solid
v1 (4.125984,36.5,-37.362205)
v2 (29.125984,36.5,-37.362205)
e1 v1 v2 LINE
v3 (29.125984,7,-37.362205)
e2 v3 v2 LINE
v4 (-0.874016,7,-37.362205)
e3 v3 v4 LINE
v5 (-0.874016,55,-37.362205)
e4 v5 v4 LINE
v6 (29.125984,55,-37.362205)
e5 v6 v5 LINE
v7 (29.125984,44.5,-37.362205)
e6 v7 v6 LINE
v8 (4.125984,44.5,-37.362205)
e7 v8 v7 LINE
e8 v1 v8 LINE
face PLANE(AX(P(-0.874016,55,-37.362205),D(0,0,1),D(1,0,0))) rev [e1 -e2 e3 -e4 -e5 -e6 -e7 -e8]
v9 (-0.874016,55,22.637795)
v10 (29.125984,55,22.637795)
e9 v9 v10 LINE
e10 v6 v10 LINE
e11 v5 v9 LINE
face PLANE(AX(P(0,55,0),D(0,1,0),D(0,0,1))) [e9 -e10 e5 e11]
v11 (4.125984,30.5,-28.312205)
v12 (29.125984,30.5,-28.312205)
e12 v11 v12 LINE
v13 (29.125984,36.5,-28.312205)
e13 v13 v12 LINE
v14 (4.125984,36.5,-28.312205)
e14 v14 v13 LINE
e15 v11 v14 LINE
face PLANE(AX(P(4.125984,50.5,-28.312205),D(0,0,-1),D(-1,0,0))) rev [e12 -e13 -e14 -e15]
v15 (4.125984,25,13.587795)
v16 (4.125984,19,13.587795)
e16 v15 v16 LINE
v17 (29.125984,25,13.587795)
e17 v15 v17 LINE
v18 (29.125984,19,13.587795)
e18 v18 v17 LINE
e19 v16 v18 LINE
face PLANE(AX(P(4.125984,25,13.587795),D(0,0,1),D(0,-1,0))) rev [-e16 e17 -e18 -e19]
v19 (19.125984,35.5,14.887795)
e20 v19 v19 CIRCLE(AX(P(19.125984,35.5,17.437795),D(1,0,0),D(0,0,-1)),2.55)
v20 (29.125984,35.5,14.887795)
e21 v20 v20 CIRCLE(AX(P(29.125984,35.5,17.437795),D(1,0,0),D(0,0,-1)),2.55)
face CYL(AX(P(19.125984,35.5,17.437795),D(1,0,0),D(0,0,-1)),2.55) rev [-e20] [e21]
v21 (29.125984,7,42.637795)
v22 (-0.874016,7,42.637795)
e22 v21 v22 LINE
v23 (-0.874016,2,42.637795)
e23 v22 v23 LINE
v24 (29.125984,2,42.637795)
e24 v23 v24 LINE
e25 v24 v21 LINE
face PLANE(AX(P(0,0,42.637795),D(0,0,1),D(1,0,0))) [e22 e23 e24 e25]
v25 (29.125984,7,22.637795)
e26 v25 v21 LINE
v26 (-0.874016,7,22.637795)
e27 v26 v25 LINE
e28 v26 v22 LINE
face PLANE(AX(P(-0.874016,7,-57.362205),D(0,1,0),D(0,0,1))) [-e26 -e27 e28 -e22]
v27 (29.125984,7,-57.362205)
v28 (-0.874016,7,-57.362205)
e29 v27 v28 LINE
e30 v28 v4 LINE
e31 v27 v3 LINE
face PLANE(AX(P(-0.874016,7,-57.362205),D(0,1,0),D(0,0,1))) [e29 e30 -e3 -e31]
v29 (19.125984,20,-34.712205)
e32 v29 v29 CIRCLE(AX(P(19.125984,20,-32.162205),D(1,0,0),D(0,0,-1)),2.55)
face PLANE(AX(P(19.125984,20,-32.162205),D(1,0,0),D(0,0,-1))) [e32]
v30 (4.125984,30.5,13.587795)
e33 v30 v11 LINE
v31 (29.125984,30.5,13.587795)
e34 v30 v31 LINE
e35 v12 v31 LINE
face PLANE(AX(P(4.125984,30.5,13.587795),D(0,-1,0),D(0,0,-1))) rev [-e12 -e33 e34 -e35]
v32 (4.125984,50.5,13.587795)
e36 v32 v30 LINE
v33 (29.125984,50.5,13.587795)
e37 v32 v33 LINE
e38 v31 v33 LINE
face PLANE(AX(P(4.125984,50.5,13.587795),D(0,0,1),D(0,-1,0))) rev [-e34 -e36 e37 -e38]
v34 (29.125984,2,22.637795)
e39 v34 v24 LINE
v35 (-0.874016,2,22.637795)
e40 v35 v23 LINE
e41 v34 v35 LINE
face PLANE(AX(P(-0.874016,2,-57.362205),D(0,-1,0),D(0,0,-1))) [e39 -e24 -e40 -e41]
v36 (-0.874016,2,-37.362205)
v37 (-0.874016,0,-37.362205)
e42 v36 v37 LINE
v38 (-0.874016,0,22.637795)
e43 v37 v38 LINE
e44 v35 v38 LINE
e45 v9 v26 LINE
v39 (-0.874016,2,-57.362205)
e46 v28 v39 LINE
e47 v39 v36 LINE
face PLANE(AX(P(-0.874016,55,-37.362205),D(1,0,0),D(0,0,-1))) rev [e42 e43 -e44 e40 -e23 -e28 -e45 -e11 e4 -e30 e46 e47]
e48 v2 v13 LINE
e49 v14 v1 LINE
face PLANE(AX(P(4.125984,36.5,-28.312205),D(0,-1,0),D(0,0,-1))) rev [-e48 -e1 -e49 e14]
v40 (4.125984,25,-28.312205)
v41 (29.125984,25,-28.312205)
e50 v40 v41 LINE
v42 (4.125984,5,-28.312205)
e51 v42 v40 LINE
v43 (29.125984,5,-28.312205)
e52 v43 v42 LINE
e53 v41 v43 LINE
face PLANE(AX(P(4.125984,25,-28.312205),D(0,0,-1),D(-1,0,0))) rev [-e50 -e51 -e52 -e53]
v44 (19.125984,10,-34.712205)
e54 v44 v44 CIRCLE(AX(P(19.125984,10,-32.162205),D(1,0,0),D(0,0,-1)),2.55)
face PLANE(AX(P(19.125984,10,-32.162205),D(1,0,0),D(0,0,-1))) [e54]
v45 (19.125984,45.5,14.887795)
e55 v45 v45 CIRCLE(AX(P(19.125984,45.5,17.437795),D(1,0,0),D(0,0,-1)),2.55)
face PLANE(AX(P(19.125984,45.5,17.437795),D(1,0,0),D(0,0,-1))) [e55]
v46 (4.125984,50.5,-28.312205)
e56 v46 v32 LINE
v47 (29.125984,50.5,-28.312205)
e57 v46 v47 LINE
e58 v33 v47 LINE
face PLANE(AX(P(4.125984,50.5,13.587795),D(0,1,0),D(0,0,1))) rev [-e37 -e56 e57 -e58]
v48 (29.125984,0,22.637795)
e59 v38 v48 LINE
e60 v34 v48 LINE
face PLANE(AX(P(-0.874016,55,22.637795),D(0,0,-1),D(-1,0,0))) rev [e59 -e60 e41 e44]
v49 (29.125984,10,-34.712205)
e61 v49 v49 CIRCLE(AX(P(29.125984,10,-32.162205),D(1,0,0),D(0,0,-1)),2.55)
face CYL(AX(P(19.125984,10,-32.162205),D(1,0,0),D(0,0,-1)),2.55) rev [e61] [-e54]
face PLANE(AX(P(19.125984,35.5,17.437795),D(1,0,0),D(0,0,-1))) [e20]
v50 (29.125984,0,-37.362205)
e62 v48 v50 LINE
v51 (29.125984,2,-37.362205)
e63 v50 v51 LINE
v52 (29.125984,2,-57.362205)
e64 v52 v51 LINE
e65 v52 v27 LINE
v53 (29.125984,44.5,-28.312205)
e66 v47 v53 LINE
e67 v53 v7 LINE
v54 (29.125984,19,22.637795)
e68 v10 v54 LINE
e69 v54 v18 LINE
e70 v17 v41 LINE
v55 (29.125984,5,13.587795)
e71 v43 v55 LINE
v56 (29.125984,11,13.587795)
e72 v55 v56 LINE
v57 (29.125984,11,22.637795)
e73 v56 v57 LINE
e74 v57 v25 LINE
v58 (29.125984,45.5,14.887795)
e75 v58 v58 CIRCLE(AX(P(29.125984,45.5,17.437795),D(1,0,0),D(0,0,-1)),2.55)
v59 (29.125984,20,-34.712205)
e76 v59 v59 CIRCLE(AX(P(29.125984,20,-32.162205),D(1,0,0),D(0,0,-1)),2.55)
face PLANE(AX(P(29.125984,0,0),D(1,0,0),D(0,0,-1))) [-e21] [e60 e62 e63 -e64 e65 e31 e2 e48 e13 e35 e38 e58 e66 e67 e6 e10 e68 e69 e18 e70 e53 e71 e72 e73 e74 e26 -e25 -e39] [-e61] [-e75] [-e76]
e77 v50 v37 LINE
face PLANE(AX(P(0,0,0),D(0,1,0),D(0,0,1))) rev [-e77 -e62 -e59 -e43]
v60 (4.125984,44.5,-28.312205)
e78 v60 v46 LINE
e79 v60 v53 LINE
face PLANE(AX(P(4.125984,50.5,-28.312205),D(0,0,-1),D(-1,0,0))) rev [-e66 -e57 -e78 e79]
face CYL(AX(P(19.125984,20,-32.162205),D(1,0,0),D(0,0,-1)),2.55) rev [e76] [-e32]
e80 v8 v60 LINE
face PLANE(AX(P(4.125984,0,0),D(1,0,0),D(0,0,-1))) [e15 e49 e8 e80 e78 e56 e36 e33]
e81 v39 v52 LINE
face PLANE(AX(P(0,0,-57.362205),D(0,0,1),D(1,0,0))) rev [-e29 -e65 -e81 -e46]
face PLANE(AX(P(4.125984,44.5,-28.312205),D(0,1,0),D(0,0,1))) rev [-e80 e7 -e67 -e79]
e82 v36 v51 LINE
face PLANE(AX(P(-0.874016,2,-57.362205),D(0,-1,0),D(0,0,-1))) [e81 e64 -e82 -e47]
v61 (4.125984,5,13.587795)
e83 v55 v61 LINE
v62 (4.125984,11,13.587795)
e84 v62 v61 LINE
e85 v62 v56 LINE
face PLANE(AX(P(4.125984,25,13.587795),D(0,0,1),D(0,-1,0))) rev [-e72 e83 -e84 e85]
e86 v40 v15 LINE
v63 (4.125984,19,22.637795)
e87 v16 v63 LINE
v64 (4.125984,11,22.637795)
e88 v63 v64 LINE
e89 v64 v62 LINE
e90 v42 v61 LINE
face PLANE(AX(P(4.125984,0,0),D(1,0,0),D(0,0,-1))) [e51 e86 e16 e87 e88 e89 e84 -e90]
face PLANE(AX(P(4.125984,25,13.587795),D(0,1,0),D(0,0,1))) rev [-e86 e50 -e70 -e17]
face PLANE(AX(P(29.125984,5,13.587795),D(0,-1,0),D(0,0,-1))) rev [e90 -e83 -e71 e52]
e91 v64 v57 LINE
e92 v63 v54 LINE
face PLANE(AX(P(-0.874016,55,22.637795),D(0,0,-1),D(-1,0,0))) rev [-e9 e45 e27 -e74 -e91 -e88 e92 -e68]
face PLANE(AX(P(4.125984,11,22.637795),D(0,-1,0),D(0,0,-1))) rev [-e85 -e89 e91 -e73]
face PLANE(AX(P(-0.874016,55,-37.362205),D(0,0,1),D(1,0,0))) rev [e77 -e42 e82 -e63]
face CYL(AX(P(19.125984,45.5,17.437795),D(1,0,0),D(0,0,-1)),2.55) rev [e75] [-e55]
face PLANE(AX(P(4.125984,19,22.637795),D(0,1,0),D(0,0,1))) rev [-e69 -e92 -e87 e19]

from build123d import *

# Parameters (mm, degrees)
SKETCH1_W                 = 43
SKETCH1_H                 = 60
BOSS_EXTRUDE1_DEPTH       = 55
SKETCH2_W                 = 41.9
SKETCH2_H                 = 20
CUT_EXTRUDE1_DEPTH        = 38
SKETCH3_W                 = 9.05
SKETCH3_H                 = 8
CUT_EXTRUDE2_DEPTH        = 38
SKETCH4_W                 = 60
SKETCH4_H                 = 55
CUT_EXTRUDE3_DEPTH        = 13
BOSS_EXTRUDE5_START       = -0.874015748
BOSS_EXTRUDE5_OUTLINE_W   = 2
BOSS_EXTRUDE5_OUTLINE_H   = 41.9
BOSS_EXTRUDE5_OUTLINE_W_2 = 5
BOSS_EXTRUDE5_OUTLINE_H_2 = 20
BOSS_EXTRUDE5_DEPTH       = 30
SKETCH12_R                = 2.55
CUT_EXTRUDE4_DEPTH        = 10
SKETCH13_R                = 2.55
CUT_EXTRUDE5_DEPTH        = 10
SKETCH15_W                = 41.9
SKETCH15_H                = 5
CUT_EXTRUDE7_DEPTH        = 25
SKETCH16_W                = 41.9
SKETCH16_H                = 3
BOSS_EXTRUDE6_DEPTH       = 25


# Read off the part's stored shape, not the designer's step: Boss-Extrude5
with BuildPart() as part:
    # Sketch1 → Boss-Extrude1 (new body)
    with BuildSketch(Plane(origin=(0, 0, 0), x_dir=(1, 0, 0), z_dir=(0, 1, 0))):
        with Locations((20.625984252, 7.362204724)):
            Rectangle(SKETCH1_W, SKETCH1_H)
    extrude(amount=BOSS_EXTRUDE1_DEPTH)

    # Sketch2 → Cut-Extrude1 (cut)
    with BuildSketch(Plane(origin=(42.125984252, 0, 0), x_dir=(0, 0, -1), z_dir=(1, 0, 0))):
        with Locations((7.362204724, 40.5)):
            Rectangle(SKETCH2_W, SKETCH2_H)
        with Locations((7.362204724, 15)):
            Rectangle(SKETCH2_W, SKETCH2_H)
    extrude(amount=-CUT_EXTRUDE1_DEPTH, mode=Mode.SUBTRACT)

    # Sketch3 → Cut-Extrude2 (cut)
    with BuildSketch(Plane(origin=(42.125984252, 0, 0), x_dir=(0, 0, -1), z_dir=(1, 0, 0))):
        with Locations((-18.112795276, 15)):
            Rectangle(SKETCH3_W, SKETCH3_H)
        with Locations((32.837204724, 40.5)):
            Rectangle(SKETCH3_W, SKETCH3_H)
    extrude(amount=-CUT_EXTRUDE2_DEPTH, mode=Mode.SUBTRACT)

    # Sketch4 → Cut-Extrude3 (cut)
    with BuildSketch(Plane(origin=(42.125984252, 0, 0), x_dir=(0, 0, -1), z_dir=(1, 0, 0))):
        with Locations((7.362204724, 27.5)):
            Rectangle(SKETCH4_W, SKETCH4_H)
    extrude(amount=-CUT_EXTRUDE3_DEPTH, mode=Mode.SUBTRACT)

    # Boss-Extrude5 outline → Boss-Extrude5 (add)
    with BuildSketch(Plane.YZ.offset(BOSS_EXTRUDE5_START)):
        with Locations((6, -7.362204724)):
            Rectangle(BOSS_EXTRUDE5_OUTLINE_W, BOSS_EXTRUDE5_OUTLINE_H)
        with Locations((4.5, -47.362204724)):
            Rectangle(BOSS_EXTRUDE5_OUTLINE_W_2, BOSS_EXTRUDE5_OUTLINE_H_2)
        with Locations((4.5, 32.637795276)):
            Rectangle(BOSS_EXTRUDE5_OUTLINE_W_2, BOSS_EXTRUDE5_OUTLINE_H_2)
    extrude(amount=BOSS_EXTRUDE5_DEPTH)

    # Sketch12 → Cut-Extrude4 (cut)
    with BuildSketch(Plane(origin=(29.125984252, 0, 0), x_dir=(0, 0, -1), z_dir=(1, 0, 0))):
        with Locations((-17.437795276, 45.5)):
            Circle(SKETCH12_R)
        with Locations((-17.437795276, 35.5)):
            Circle(SKETCH12_R)
    extrude(amount=-CUT_EXTRUDE4_DEPTH, mode=Mode.SUBTRACT)

    # Sketch13 → Cut-Extrude5 (cut)
    with BuildSketch(Plane(origin=(29.125984252, 0, 0), x_dir=(0, 0, -1), z_dir=(1, 0, 0))):
        with Locations((32.162204724, 20)):
            Circle(SKETCH13_R)
        with Locations((32.162204724, 10)):
            Circle(SKETCH13_R)
    extrude(amount=-CUT_EXTRUDE5_DEPTH, mode=Mode.SUBTRACT)

    # Sketch15 → Cut-Extrude7 (cut)
    with BuildSketch(Plane(origin=(29.125984252, 0, 0), x_dir=(0, 0, -1), z_dir=(1, 0, 0))):
        with Locations((7.362204724, 4.5)):
            Rectangle(SKETCH15_W, SKETCH15_H)
    extrude(amount=-CUT_EXTRUDE7_DEPTH, mode=Mode.SUBTRACT)

    # Sketch16 → Boss-Extrude6 (add)
    with BuildSketch(Plane(origin=(4.125984252, 0, 0), x_dir=(0, 0, -1), z_dir=(1, 0, 0))):
        with Locations((7.362204724, 3.5)):
            Rectangle(SKETCH16_W, SKETCH16_H)
    extrude(amount=BOSS_EXTRUDE6_DEPTH)


solid = part.part
